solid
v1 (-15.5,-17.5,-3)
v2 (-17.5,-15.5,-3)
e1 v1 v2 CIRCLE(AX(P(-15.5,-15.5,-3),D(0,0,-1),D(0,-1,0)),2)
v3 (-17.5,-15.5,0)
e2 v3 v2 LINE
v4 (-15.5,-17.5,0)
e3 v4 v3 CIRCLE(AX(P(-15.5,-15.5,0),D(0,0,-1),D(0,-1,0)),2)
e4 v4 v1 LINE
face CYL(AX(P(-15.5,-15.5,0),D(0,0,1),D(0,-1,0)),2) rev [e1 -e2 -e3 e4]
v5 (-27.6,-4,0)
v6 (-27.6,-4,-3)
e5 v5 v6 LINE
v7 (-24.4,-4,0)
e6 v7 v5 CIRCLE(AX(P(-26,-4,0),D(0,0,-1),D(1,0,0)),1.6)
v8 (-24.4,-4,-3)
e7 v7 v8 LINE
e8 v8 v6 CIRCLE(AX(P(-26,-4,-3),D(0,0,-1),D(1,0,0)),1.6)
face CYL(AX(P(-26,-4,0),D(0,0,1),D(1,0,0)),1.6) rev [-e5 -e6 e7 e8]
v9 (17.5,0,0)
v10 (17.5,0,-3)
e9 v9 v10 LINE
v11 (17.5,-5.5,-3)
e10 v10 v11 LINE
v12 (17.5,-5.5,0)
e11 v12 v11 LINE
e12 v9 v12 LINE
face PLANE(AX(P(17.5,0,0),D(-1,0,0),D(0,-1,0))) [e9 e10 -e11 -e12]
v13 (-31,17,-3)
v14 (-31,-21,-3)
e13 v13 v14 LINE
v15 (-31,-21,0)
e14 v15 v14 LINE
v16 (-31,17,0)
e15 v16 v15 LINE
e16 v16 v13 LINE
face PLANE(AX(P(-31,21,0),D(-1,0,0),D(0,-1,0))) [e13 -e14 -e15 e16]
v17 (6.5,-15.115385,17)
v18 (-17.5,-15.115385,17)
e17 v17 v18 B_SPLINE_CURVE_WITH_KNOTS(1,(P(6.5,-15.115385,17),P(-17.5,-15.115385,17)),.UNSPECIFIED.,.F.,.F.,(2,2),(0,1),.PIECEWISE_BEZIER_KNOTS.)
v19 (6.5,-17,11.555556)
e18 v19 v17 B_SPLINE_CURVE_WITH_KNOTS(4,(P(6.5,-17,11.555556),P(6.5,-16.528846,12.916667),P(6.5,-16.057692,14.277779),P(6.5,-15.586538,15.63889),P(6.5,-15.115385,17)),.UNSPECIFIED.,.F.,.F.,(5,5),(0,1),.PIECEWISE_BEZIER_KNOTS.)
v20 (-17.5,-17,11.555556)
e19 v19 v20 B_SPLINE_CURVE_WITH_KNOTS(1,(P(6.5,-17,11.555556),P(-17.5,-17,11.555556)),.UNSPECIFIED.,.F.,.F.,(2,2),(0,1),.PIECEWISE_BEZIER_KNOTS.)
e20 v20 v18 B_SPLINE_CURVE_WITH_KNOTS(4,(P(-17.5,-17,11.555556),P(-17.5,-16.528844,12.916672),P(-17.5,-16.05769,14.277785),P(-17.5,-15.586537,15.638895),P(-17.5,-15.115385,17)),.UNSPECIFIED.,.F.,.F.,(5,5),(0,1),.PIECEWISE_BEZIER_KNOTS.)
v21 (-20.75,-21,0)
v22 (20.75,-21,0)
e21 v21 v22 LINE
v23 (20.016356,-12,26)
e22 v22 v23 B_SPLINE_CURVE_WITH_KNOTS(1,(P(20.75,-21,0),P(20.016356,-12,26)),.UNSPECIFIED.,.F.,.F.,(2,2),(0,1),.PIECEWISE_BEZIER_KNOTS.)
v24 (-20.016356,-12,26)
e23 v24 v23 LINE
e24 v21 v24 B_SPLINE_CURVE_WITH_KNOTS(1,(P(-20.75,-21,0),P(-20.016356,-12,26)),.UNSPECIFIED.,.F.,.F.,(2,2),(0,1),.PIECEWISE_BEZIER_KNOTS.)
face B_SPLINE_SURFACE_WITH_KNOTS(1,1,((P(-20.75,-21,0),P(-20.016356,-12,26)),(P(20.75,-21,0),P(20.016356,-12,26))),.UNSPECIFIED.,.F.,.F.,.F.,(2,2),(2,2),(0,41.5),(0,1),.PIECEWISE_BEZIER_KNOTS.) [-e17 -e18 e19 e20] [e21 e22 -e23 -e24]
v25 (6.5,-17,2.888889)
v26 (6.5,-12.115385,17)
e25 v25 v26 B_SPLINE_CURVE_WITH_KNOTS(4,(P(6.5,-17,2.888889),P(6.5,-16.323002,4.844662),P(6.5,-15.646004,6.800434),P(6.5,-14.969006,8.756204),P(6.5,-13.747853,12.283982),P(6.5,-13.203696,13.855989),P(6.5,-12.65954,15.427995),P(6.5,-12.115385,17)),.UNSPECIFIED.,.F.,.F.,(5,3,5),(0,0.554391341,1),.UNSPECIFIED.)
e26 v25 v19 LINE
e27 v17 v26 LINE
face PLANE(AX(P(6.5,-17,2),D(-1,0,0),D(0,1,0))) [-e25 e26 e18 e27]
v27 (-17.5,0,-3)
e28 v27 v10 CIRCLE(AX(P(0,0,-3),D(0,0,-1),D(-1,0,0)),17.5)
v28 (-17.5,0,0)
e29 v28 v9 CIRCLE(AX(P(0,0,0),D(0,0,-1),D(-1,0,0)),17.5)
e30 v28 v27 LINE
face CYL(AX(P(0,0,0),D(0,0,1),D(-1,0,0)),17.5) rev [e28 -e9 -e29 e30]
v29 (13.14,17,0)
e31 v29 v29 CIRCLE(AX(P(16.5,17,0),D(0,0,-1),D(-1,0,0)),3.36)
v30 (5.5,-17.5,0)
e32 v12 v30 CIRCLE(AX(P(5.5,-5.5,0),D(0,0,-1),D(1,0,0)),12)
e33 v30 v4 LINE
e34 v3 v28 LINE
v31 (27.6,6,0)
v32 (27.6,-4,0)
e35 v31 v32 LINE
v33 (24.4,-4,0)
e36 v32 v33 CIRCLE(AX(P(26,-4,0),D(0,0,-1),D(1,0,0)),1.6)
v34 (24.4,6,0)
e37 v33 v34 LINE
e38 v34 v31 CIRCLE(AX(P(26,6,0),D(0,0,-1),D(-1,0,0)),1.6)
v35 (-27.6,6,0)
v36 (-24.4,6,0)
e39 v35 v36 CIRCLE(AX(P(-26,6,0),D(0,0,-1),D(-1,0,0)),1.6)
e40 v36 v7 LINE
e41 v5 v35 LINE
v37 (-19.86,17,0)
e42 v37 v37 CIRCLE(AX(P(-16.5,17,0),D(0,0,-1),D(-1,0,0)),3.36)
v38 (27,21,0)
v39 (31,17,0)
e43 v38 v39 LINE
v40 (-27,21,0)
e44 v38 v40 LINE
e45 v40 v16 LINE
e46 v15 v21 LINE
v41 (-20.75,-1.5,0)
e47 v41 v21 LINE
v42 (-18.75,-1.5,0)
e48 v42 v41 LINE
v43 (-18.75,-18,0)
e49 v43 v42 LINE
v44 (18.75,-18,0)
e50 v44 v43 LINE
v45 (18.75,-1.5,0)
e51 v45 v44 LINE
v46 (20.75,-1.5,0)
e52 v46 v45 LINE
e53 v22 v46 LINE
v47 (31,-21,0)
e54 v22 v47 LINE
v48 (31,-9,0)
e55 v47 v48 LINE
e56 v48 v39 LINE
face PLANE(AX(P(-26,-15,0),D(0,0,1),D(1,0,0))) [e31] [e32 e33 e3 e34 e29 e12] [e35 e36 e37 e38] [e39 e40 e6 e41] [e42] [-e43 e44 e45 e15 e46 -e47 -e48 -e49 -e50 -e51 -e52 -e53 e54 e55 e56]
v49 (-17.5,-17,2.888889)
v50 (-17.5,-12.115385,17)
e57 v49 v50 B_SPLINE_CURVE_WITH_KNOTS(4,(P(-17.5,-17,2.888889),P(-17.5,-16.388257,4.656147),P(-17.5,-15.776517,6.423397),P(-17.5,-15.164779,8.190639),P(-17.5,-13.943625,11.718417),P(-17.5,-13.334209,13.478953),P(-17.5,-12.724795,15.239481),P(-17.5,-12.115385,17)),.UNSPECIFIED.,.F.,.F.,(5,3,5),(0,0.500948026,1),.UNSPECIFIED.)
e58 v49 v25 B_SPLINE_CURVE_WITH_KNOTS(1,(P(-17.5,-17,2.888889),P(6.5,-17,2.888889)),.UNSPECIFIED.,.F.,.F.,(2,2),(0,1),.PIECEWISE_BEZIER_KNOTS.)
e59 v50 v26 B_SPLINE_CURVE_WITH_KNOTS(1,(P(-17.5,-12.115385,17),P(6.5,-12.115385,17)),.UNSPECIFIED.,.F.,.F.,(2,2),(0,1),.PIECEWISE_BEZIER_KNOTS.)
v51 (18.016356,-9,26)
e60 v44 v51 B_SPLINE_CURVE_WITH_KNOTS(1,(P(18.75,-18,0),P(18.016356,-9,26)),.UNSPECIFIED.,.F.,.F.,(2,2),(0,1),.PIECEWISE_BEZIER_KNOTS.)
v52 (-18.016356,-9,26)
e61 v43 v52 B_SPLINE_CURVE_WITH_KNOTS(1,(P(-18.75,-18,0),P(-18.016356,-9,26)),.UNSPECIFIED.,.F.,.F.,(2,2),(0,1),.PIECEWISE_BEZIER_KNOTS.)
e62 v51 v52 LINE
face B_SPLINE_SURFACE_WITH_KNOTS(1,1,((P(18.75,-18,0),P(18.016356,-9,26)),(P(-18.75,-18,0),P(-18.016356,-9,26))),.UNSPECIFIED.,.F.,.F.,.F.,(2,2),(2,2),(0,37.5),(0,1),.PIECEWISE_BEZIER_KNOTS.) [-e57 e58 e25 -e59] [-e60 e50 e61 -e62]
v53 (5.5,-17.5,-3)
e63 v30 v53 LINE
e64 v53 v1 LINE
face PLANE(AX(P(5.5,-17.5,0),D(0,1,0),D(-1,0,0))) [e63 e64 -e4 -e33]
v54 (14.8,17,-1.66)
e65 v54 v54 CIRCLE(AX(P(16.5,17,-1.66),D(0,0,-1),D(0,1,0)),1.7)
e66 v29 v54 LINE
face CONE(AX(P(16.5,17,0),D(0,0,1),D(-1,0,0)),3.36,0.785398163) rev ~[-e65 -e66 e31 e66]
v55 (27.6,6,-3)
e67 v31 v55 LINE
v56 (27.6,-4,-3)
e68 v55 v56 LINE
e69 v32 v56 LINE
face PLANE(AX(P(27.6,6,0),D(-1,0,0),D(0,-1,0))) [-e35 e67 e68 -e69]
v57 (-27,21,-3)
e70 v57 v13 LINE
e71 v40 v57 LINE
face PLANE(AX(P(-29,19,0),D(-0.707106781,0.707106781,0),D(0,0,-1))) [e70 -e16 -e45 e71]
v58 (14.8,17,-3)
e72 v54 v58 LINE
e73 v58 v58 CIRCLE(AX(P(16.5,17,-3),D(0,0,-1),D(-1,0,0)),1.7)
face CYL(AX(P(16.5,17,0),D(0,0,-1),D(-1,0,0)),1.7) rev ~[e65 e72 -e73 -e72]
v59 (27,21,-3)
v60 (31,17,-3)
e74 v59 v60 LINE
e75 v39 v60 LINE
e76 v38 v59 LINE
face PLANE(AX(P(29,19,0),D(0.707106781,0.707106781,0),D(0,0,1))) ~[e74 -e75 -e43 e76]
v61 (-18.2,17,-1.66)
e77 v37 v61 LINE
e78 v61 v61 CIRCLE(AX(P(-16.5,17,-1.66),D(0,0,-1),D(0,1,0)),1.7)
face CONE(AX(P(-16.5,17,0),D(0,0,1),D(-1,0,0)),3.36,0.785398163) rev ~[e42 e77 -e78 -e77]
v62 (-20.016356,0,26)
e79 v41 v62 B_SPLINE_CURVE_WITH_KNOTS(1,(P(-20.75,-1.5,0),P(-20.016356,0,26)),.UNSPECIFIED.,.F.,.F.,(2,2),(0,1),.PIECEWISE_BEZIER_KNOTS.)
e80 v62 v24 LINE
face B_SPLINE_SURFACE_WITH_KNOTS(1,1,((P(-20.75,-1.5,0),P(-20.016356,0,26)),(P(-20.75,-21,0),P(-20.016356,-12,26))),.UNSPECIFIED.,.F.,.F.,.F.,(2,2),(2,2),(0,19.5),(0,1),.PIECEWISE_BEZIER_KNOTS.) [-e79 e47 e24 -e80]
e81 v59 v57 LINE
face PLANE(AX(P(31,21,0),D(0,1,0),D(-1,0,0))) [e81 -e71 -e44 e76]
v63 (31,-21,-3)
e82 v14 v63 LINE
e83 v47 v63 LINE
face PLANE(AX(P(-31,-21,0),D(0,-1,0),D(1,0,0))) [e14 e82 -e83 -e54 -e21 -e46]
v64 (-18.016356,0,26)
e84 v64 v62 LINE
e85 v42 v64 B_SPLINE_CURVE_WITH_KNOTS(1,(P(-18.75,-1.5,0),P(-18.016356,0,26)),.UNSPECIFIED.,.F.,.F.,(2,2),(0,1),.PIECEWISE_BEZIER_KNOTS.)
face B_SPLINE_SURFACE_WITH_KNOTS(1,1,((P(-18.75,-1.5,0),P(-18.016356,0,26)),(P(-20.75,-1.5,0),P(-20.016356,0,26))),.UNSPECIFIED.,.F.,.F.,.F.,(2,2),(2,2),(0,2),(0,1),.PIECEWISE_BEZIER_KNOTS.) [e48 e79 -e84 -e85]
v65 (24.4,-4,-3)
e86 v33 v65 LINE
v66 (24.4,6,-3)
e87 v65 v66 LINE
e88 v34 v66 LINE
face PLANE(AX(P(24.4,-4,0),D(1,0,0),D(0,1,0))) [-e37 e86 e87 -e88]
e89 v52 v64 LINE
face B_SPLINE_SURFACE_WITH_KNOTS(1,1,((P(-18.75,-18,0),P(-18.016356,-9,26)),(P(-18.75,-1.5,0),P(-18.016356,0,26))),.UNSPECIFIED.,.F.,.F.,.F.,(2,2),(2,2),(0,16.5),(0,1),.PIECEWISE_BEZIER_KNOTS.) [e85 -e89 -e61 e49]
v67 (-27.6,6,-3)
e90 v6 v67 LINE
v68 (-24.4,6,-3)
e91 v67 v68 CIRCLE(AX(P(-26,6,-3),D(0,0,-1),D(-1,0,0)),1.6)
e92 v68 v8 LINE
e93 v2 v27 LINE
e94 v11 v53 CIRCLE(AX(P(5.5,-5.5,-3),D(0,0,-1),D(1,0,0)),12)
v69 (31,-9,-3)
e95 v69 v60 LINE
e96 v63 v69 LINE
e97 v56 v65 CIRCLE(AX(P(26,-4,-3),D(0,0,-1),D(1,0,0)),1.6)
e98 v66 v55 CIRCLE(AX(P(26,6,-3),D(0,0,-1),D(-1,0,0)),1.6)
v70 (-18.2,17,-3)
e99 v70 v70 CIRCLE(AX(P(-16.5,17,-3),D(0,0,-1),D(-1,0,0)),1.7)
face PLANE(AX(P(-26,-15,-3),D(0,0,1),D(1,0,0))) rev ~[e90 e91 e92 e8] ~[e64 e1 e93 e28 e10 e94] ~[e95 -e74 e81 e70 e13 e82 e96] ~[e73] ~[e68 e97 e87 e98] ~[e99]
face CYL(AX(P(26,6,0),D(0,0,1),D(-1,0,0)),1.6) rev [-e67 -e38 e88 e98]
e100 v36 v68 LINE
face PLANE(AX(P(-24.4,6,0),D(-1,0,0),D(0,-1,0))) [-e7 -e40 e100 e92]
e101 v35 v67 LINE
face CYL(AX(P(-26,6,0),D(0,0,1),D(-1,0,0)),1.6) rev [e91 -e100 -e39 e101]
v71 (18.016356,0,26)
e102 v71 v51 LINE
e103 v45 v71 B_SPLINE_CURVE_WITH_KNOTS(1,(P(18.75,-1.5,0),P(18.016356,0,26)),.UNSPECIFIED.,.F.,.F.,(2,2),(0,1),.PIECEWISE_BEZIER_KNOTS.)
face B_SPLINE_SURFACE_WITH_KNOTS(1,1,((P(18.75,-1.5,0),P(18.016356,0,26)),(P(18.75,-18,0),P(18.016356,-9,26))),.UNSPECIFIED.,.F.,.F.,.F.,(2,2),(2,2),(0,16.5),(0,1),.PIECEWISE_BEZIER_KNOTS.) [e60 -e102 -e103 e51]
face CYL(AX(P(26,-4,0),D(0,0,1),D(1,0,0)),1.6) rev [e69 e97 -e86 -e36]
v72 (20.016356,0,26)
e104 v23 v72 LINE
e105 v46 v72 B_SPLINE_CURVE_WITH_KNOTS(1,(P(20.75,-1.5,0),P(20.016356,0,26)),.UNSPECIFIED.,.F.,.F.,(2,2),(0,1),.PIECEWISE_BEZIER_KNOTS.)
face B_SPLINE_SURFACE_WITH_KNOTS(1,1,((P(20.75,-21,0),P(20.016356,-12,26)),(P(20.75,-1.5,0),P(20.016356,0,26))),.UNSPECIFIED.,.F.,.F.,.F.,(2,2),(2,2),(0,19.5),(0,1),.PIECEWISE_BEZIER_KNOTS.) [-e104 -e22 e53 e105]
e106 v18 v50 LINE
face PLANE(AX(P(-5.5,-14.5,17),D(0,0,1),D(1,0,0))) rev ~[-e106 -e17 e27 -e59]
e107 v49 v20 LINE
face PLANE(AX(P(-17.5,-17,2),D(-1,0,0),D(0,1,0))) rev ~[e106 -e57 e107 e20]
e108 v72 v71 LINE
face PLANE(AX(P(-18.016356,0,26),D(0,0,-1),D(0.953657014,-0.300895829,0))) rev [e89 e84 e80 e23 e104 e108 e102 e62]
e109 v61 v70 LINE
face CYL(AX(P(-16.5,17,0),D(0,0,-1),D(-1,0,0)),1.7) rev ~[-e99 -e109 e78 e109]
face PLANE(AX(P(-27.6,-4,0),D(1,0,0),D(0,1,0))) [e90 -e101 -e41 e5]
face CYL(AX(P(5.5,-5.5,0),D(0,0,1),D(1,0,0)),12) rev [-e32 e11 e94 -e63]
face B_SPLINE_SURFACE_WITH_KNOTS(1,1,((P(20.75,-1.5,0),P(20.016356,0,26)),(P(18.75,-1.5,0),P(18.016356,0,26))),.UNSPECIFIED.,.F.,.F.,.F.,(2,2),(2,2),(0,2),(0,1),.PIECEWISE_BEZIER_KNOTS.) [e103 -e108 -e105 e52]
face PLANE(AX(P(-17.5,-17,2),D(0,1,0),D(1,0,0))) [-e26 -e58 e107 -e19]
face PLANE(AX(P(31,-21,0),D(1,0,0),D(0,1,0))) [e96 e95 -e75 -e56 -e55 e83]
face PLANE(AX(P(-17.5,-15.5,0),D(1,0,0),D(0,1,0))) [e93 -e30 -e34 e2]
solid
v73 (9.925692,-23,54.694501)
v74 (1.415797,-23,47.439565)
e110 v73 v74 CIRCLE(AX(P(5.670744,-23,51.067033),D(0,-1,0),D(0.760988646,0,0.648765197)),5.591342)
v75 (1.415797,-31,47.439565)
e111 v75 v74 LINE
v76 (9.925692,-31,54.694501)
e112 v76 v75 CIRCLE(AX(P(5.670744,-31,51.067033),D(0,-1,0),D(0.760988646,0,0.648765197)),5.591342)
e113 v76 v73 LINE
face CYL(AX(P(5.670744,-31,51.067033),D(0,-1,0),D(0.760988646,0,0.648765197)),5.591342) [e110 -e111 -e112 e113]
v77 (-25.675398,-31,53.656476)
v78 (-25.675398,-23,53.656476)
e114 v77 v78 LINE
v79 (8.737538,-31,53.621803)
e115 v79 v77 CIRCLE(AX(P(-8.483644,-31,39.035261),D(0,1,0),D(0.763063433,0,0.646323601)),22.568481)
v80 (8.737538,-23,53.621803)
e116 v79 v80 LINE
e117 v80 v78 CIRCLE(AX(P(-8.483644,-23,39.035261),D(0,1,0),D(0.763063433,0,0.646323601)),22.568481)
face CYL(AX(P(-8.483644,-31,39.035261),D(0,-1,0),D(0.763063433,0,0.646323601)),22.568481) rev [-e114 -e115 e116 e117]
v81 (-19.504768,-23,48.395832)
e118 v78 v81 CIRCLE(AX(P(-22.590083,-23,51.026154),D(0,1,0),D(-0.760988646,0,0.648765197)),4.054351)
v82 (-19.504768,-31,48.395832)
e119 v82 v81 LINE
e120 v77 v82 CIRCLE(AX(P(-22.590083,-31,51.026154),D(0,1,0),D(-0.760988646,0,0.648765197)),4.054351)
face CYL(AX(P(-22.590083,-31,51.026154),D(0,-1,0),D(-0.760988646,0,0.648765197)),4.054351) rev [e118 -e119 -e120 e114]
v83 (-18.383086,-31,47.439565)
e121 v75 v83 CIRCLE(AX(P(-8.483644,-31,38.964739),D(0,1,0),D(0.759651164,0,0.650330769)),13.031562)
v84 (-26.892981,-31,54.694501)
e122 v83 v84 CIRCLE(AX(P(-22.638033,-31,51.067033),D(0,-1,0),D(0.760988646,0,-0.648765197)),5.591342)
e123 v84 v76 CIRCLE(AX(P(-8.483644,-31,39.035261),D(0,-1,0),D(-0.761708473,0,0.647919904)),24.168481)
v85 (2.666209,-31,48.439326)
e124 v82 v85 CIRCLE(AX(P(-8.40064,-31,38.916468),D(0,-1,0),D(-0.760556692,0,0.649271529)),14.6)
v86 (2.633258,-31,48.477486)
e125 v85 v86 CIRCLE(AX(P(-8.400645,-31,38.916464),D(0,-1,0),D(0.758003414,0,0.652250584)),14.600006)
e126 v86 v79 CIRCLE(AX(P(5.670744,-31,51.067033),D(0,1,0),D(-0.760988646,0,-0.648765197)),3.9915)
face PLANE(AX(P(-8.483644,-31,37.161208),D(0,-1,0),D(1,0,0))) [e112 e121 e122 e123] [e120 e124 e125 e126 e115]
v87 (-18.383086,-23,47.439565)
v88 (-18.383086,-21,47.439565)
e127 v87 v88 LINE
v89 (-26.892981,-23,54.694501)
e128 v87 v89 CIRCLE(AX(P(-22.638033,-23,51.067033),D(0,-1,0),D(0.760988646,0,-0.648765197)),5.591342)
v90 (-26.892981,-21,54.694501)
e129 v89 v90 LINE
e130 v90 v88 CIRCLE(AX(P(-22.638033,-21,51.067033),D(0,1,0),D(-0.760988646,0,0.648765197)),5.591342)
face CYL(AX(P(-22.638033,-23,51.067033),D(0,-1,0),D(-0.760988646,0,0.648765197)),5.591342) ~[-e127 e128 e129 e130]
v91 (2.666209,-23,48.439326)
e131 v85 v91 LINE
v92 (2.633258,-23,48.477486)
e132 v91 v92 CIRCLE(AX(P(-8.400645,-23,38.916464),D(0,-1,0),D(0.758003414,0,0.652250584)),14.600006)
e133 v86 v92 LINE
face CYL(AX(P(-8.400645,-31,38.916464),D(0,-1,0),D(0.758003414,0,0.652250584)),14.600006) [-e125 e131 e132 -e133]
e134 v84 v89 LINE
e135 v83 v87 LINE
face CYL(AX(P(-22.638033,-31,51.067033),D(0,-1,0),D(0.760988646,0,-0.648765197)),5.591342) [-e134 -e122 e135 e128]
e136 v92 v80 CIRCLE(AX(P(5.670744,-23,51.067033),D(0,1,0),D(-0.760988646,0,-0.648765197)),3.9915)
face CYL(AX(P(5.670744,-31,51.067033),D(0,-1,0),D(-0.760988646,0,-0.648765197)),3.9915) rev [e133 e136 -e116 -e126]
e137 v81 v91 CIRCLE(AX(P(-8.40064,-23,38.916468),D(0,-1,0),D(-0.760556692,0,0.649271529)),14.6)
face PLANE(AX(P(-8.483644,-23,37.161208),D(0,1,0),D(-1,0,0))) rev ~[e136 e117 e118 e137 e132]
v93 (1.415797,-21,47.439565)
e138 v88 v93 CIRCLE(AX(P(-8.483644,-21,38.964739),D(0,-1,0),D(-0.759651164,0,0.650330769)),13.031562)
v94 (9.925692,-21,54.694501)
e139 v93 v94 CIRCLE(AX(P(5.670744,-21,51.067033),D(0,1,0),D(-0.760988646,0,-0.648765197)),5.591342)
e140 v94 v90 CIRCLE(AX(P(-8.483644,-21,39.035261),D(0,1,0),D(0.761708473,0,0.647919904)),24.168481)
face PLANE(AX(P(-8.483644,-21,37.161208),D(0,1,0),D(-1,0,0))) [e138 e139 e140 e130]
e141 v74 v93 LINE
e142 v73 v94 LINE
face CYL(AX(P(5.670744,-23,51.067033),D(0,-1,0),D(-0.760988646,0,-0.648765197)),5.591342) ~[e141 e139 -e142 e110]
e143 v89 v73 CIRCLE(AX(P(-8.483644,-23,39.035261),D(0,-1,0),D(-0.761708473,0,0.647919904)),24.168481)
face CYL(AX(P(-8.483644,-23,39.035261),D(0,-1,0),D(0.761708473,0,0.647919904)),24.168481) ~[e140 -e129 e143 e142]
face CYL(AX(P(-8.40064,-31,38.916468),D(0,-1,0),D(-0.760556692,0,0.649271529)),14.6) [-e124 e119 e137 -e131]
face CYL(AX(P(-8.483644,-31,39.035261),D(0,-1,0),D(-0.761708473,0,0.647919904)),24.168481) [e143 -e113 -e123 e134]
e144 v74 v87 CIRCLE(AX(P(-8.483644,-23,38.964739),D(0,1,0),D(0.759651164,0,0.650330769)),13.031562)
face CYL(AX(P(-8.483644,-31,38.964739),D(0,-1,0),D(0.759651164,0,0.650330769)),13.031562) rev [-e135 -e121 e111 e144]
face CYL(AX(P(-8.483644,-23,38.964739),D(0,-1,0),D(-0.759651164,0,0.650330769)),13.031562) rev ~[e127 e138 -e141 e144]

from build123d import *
from build123d import SkipClean  # not in build123d's __all__

# Parameters (mm, degrees)
F0_W           = 10
F0_H           = 12
F0_W_2         = 9.9836443961
F1_DEPTH       = 3
F2_D           = 3.4
F2_CSINK_D     = 6.72
F2_CSINK_ANGLE = 90
F3_SIZE        = 4
F9_W           = 24
F9_H           = 5
F10_DEPTH      = 15
F15_DEPTH      = 8
F17_DEPTH      = 2


# Not quite as in the source:
# - a feature names something its author has since deleted; it is built from what else it names


with BuildPart() as f1:
    # F0 (on Top) → F1 (new body)
    with BuildSketch(Plane.XY):
        with Locations((-26, -15)):
            Rectangle(F0_W, F0_H)
        with Locations((26.008177802, -15)):
            Rectangle(F0_W_2, F0_H)
        Polygon((31, 21), (-31, 21), (-31, -9), (-21, -9), (-21, -21), (21.0163556039, -21), (21.0163556039, -9), (31, -9), align=None)
        with BuildLine():
            ThreePointArc((-24.4, -4), (-26, -5.6), (-27.6, -4))
            Line((-27.6, -4), (-27.6, 6))
            ThreePointArc((-27.6, 6), (-26, 7.6), (-24.4, 6))
            Line((-24.4, 6), (-24.4, -4))
        make_face(mode=Mode.SUBTRACT)
        with BuildLine():
            ThreePointArc((-17.5, 0), (0, 17.5), (17.5, 0))
            Line((17.5, 0), (17.5, -5.5))
            ThreePointArc((17.5, -5.5), (13.9852813742, -13.9852813742), (5.5, -17.5))
            Line((5.5, -17.5), (-15.5, -17.5))
            ThreePointArc((-15.5, -17.5), (-16.9142135624, -16.9142135624), (-17.5, -15.5))
            Line((-17.5, -15.5), (-17.5, 0))
        make_face(mode=Mode.SUBTRACT)
        with BuildLine():
            ThreePointArc((27.6, -4), (26, -5.6), (24.4, -4))
            Line((24.4, -4), (24.4, 6))
            ThreePointArc((24.4, 6), (26, 7.6), (27.6, 6))
            Line((27.6, 6), (27.6, -4))
        make_face(mode=Mode.SUBTRACT)
    extrude(amount=-F1_DEPTH)

    # F2 (through all)
    with Locations(Plane.XY):
        with Locations((-16.5, 17), (16.5, 17)):
            CounterSinkHole(F2_D / 2, F2_CSINK_D / 2, counter_sink_angle=F2_CSINK_ANGLE)

    # F3
    f3_edges = [f1.edges().sort_by_distance(p)[0] for p in [
        (31, 21, -1.5),
        (-31, 21, -1.5),
    ]]
    chamfer(f3_edges, length=F3_SIZE)

    # F4 (on face) → F7 section 0
    with BuildSketch(Plane.XY):
        Polygon((-18.75, -1.5), (-20.75, -1.5), (-20.75, -21), (20.75, -21), (20.75, -1.5), (18.75, -1.5), (18.75, -18), (-18.75, -18), align=None)
    # F6 (on offset) → F7 section 1
    with BuildSketch(Plane.XY.offset(26)):
        Polygon((-20.0163556039, 0), (-20.0163556039, -12), (20.0163556039, -12), (20.0163556039, 0), (18.0163556039, 0), (18.0163556039, -9), (-18.0163556039, -9), (-18.0163556039, 0), align=None)
    loft()

    # F9 (on offset) → F10 (cut)
    with BuildSketch(Plane.XY.offset(2)):
        with Locations((-5.5, -14.5)):
            Rectangle(F9_W, F9_H)
    extrude(amount=F10_DEPTH, mode=Mode.SUBTRACT)


with BuildPart() as f15:
    # F13 (on offset) → F15 (new body)
    with BuildSketch(Plane.XZ.offset(31)):
        with BuildLine():
            ThreePointArc((-18.3830856085, 47.4395647135), (-19.0105652692, 55.3219802644), (-26.8929808201, 54.6945006036))
            ThreePointArc((-26.8929808201, 54.6945006036), (-8.4836443961, 14.8667804257), (9.9256920279, 54.6945006036))
            ThreePointArc((9.9256920279, 54.6945006036), (2.0432764771, 55.3219802644), (1.4157968163, 47.4395647135))
            ThreePointArc((1.4157968163, 47.4395647135), (-8.4836443961, 25.9331770523), (-18.3830856085, 47.4395647135))
        make_face()
        with BuildLine():
            ThreePointArc((8.7375378537, 53.6218026281), (-8.5063834027, 16.4667918811), (-25.6753981826, 53.6564756038))
            ThreePointArc((-25.6753981826, 53.6564756038), (-19.959761381, 54.1114688502), (-19.5047681345, 48.3958320486))
            ThreePointArc((-19.5047681345, 48.3958320486), (-8.3719987512, 24.316495823), (2.666209427, 48.439326242))
            ThreePointArc((2.666209427, 48.439326242), (2.6497503397, 48.4584205612), (2.6332583079, 48.4774864329))
            ThreePointArc((2.6332583079, 48.4774864329), (3.0985445837, 54.1192219614), (8.7375378537, 53.6218026281))
        make_face(mode=Mode.SUBTRACT)
    extrude(amount=-F15_DEPTH)

    # F16 (on face) → F17 (join)
    with BuildSketch(Plane(origin=(0, -23, 0), x_dir=(-1, 0, 0), z_dir=(0, 1, 0))):
        with BuildLine():
            ThreePointArc((26.8929808201, 54.6945006036), (19.0105652692, 55.3219802644), (18.3830856085, 47.4395647135))
            ThreePointArc((18.3830856085, 47.4395647135), (8.4836443961, 25.9331770523), (-1.4157968163, 47.4395647135))
            ThreePointArc((-1.4157968163, 47.4395647135), (-2.0432764771, 55.3219802644), (-9.9256920279, 54.6945006036))
            ThreePointArc((-9.9256920279, 54.6945006036), (8.4836443961, 14.8667804257), (26.8929808201, 54.6945006036))
        make_face()
    with SkipClean():  # cleaning this boolean's faces spoils the solid; the shape is the same uncleaned
        extrude(amount=F17_DEPTH)


solid = Compound([f1.part, f15.part])
